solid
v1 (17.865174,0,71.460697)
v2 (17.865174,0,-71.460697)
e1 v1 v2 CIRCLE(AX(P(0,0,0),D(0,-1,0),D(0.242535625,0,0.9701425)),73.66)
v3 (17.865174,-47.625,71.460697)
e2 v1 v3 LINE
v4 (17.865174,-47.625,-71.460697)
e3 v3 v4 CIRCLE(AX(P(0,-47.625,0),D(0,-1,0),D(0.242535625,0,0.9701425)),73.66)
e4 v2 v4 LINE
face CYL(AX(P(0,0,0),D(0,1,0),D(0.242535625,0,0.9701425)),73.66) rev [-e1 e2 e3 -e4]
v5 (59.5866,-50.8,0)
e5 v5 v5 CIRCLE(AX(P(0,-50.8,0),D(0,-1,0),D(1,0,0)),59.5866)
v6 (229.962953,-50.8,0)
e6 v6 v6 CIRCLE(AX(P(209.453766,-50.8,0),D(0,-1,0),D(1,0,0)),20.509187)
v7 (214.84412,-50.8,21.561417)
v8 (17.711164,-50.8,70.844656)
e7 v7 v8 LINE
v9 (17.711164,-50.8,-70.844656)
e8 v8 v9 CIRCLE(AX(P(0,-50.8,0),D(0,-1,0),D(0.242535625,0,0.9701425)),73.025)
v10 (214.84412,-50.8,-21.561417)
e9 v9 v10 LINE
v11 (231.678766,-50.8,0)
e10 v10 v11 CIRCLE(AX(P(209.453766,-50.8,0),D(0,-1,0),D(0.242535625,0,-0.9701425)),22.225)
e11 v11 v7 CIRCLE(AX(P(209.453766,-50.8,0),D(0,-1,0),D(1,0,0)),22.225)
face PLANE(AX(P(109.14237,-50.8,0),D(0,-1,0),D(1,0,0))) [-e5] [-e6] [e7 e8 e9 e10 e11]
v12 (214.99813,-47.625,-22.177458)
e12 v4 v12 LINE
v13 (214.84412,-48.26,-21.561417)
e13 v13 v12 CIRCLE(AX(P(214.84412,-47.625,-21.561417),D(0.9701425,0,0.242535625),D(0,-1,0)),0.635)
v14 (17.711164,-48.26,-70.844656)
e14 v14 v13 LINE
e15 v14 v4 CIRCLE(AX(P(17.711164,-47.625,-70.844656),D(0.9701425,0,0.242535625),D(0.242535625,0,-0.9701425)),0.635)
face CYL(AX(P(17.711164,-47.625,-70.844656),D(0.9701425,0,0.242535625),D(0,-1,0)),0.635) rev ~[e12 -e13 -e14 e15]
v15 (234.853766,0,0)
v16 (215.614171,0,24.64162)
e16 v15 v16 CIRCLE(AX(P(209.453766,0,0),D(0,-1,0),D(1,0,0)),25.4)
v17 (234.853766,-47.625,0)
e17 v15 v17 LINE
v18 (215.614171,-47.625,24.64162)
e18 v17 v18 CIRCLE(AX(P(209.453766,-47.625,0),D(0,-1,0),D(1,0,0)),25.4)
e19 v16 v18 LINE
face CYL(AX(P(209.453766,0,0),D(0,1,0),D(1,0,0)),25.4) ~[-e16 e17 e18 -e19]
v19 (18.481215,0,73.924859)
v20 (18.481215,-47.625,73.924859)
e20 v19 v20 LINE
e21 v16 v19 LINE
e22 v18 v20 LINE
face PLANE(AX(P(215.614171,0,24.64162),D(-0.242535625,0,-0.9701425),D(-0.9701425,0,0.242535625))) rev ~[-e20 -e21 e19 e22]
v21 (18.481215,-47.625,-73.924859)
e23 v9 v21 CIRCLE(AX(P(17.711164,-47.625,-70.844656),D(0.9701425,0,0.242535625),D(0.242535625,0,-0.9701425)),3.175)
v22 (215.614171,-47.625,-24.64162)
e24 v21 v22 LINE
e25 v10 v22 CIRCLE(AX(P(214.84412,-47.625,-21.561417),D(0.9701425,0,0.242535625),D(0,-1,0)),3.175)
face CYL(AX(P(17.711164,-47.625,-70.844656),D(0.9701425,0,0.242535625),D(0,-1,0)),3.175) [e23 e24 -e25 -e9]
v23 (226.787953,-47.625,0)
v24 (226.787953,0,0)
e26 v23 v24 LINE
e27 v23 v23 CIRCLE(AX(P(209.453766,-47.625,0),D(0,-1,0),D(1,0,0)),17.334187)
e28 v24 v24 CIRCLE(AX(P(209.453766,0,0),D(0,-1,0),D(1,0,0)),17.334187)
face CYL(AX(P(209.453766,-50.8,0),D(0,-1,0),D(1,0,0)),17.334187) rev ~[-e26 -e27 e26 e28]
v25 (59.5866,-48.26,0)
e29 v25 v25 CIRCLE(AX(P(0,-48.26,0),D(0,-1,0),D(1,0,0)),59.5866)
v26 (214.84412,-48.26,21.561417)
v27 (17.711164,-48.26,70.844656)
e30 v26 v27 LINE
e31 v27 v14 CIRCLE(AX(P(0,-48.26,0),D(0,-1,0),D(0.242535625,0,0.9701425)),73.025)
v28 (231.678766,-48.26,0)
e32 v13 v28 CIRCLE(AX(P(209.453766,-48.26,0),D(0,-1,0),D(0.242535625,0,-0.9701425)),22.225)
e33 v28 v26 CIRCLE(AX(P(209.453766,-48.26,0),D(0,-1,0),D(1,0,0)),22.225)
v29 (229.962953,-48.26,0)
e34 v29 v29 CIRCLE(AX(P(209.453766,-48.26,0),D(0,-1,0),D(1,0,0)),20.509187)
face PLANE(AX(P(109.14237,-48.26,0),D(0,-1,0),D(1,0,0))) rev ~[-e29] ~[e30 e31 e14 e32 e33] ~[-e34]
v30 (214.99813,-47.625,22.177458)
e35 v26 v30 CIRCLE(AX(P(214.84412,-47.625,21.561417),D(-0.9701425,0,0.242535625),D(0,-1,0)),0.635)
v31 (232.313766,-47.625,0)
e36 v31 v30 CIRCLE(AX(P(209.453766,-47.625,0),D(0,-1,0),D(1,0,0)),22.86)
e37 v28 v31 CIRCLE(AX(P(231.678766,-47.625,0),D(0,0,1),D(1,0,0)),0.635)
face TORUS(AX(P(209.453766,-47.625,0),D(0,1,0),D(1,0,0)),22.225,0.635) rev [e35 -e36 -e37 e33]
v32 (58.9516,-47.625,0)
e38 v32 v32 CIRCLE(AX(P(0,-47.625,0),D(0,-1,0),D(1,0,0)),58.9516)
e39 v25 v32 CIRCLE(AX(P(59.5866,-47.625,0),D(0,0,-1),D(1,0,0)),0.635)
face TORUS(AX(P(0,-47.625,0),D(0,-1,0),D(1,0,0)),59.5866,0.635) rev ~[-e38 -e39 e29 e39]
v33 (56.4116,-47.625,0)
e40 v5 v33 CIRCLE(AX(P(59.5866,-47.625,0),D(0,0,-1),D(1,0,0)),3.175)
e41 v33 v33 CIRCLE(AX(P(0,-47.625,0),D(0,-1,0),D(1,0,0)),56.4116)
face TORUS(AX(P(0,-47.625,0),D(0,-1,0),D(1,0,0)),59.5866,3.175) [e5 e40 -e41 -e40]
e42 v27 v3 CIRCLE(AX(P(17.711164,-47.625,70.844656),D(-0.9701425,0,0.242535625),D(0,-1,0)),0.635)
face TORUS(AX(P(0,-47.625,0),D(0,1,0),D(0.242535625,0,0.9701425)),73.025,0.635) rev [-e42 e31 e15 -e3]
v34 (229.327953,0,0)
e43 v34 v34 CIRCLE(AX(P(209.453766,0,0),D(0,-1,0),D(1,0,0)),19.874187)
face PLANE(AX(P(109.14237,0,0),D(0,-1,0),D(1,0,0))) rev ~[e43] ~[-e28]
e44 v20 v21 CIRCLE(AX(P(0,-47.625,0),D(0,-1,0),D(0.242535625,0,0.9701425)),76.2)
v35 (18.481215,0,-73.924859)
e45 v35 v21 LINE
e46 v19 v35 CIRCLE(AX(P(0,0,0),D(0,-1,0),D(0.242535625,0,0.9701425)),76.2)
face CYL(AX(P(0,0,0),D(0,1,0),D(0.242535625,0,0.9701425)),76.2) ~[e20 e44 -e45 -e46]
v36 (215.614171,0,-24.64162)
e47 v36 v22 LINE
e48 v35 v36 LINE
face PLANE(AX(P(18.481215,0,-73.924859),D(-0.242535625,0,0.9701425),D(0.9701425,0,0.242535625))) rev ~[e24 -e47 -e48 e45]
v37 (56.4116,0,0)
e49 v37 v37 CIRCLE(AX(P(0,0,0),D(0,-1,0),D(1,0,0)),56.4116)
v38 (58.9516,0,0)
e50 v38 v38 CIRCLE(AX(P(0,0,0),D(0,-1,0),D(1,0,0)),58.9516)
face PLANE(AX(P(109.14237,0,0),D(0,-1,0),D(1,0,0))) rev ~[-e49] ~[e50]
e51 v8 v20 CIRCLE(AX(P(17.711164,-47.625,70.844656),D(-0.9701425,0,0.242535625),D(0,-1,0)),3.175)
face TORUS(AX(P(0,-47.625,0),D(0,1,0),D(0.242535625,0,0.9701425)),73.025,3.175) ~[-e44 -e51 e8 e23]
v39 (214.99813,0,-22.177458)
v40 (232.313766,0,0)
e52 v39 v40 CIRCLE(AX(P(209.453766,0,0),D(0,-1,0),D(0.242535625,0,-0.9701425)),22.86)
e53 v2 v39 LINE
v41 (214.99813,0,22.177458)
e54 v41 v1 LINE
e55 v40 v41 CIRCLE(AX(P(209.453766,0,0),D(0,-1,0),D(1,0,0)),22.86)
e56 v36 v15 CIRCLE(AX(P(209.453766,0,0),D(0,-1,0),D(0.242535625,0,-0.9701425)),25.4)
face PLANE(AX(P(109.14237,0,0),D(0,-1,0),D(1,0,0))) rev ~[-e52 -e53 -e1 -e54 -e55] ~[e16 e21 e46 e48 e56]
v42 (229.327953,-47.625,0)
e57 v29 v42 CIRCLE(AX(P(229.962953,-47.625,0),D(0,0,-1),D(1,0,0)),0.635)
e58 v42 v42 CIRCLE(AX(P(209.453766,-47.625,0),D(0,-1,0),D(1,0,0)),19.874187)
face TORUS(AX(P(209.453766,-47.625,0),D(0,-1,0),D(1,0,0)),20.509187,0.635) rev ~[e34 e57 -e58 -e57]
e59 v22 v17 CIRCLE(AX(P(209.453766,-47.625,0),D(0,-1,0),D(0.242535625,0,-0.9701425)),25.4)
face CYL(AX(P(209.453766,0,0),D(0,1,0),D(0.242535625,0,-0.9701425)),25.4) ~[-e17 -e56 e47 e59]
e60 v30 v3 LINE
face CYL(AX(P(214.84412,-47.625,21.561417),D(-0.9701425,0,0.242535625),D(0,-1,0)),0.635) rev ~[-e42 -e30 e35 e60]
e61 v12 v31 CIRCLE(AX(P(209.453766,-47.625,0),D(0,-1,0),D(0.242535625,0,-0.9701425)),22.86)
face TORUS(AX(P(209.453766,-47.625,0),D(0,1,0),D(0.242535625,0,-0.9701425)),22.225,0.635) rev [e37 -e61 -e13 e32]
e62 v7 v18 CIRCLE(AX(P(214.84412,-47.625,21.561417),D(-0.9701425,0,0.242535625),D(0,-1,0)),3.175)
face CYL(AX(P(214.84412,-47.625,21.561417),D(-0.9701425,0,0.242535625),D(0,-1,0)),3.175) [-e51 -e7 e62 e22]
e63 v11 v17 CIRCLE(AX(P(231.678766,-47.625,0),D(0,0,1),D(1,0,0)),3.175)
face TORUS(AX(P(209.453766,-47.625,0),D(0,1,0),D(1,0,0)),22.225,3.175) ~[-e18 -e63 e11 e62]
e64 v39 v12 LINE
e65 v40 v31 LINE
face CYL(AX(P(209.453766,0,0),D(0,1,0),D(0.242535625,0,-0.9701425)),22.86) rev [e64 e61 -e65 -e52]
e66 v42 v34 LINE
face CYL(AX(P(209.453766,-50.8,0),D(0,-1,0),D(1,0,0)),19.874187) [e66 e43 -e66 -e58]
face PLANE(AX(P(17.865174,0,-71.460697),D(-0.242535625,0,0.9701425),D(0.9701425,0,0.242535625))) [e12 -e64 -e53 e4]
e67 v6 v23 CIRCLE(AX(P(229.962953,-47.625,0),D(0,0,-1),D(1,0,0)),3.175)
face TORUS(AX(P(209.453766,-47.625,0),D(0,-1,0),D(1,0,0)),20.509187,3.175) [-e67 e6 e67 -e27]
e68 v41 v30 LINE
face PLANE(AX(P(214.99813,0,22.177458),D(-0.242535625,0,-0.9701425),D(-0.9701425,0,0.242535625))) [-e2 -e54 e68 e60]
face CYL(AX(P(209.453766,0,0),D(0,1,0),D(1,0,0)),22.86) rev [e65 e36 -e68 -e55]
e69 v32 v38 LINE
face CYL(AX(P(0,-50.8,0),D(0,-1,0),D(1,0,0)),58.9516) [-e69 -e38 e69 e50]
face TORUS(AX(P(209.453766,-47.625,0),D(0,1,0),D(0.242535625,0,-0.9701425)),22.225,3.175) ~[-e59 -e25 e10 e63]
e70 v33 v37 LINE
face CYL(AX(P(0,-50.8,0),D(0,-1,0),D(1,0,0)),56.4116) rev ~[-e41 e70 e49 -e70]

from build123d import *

# Parameters (mm, degrees)
F1_DEPTH = 50.8
F2_R     = 56.411599825
F2_R_2   = 17.3341868335
F3_DEPTH = 50.8
F4_R     = 3.175
F5_T     = -2.54


with BuildPart() as f1:
    # F0 (on Front) → F1 (new body)
    with BuildSketch(Plane.XZ):
        with BuildLine():
            ThreePointArc((18.4812146278, 73.9248585111), (60.0612543768, 46.8944103565), (76.2, 0))
            ThreePointArc((76.2, 0), (60.0612543768, -46.8944103565), (18.4812146278, -73.9248585111))
            Line((18.4812146278, -73.9248585111), (215.6141706573, -24.6416195037))
            ThreePointArc((215.6141706573, -24.6416195037), (184.0537657814, 0), (215.6141706573, 24.6416195037))
            Line((215.6141706573, 24.6416195037), (18.4812146278, 73.9248585111))
        make_face()
        with BuildLine():
            ThreePointArc((234.8537657814, 0), (229.474183907, 15.6314701188), (215.6141706573, 24.6416195037))
            ThreePointArc((215.6141706573, 24.6416195037), (184.0537657814, 0), (215.6141706573, -24.6416195037))
            ThreePointArc((215.6141706573, -24.6416195037), (229.474183907, -15.6314701188), (234.8537657814, 0))
        make_face()
        with BuildLine():
            ThreePointArc((18.4812146278, -73.9248585111), (60.0612543768, -46.8944103565), (76.2, 0))
            ThreePointArc((76.2, 0), (60.0612543768, 46.8944103565), (18.4812146278, 73.9248585111))
            ThreePointArc((18.4812146278, 73.9248585111), (-76.2, 0), (18.4812146278, -73.9248585111))
        make_face()
    extrude(amount=F1_DEPTH)

    # F2 (on face) → F3 (cut)
    with BuildSketch(Plane.XZ.offset(50.8)):
        Circle(F2_R)
        with Locations((209.4537657814, 0)):
            Circle(F2_R_2)
    extrude(amount=-F3_DEPTH, mode=Mode.SUBTRACT)

    # F4
    f4_edges = [f1.edges().sort_by_distance(p)[0] for p in [
        (117.047693, -50.8, 49.283239),
        (234.853766, -50.8, 0),
        (-76.2, -50.8, 0),
        (117.047693, -50.8, -49.283239),
        (-56.4116, -50.8, 0),
        (192.119579, -50.8, 0),
    ]]
    fillet(f4_edges, radius=F4_R)

    # F5
    f5_openings = [f1.faces().sort_by_distance(p)[0] for p in [
        (77.972977, 0, 0),
    ]]
    offset(amount=F5_T, openings=f5_openings)


solid = f1.part
